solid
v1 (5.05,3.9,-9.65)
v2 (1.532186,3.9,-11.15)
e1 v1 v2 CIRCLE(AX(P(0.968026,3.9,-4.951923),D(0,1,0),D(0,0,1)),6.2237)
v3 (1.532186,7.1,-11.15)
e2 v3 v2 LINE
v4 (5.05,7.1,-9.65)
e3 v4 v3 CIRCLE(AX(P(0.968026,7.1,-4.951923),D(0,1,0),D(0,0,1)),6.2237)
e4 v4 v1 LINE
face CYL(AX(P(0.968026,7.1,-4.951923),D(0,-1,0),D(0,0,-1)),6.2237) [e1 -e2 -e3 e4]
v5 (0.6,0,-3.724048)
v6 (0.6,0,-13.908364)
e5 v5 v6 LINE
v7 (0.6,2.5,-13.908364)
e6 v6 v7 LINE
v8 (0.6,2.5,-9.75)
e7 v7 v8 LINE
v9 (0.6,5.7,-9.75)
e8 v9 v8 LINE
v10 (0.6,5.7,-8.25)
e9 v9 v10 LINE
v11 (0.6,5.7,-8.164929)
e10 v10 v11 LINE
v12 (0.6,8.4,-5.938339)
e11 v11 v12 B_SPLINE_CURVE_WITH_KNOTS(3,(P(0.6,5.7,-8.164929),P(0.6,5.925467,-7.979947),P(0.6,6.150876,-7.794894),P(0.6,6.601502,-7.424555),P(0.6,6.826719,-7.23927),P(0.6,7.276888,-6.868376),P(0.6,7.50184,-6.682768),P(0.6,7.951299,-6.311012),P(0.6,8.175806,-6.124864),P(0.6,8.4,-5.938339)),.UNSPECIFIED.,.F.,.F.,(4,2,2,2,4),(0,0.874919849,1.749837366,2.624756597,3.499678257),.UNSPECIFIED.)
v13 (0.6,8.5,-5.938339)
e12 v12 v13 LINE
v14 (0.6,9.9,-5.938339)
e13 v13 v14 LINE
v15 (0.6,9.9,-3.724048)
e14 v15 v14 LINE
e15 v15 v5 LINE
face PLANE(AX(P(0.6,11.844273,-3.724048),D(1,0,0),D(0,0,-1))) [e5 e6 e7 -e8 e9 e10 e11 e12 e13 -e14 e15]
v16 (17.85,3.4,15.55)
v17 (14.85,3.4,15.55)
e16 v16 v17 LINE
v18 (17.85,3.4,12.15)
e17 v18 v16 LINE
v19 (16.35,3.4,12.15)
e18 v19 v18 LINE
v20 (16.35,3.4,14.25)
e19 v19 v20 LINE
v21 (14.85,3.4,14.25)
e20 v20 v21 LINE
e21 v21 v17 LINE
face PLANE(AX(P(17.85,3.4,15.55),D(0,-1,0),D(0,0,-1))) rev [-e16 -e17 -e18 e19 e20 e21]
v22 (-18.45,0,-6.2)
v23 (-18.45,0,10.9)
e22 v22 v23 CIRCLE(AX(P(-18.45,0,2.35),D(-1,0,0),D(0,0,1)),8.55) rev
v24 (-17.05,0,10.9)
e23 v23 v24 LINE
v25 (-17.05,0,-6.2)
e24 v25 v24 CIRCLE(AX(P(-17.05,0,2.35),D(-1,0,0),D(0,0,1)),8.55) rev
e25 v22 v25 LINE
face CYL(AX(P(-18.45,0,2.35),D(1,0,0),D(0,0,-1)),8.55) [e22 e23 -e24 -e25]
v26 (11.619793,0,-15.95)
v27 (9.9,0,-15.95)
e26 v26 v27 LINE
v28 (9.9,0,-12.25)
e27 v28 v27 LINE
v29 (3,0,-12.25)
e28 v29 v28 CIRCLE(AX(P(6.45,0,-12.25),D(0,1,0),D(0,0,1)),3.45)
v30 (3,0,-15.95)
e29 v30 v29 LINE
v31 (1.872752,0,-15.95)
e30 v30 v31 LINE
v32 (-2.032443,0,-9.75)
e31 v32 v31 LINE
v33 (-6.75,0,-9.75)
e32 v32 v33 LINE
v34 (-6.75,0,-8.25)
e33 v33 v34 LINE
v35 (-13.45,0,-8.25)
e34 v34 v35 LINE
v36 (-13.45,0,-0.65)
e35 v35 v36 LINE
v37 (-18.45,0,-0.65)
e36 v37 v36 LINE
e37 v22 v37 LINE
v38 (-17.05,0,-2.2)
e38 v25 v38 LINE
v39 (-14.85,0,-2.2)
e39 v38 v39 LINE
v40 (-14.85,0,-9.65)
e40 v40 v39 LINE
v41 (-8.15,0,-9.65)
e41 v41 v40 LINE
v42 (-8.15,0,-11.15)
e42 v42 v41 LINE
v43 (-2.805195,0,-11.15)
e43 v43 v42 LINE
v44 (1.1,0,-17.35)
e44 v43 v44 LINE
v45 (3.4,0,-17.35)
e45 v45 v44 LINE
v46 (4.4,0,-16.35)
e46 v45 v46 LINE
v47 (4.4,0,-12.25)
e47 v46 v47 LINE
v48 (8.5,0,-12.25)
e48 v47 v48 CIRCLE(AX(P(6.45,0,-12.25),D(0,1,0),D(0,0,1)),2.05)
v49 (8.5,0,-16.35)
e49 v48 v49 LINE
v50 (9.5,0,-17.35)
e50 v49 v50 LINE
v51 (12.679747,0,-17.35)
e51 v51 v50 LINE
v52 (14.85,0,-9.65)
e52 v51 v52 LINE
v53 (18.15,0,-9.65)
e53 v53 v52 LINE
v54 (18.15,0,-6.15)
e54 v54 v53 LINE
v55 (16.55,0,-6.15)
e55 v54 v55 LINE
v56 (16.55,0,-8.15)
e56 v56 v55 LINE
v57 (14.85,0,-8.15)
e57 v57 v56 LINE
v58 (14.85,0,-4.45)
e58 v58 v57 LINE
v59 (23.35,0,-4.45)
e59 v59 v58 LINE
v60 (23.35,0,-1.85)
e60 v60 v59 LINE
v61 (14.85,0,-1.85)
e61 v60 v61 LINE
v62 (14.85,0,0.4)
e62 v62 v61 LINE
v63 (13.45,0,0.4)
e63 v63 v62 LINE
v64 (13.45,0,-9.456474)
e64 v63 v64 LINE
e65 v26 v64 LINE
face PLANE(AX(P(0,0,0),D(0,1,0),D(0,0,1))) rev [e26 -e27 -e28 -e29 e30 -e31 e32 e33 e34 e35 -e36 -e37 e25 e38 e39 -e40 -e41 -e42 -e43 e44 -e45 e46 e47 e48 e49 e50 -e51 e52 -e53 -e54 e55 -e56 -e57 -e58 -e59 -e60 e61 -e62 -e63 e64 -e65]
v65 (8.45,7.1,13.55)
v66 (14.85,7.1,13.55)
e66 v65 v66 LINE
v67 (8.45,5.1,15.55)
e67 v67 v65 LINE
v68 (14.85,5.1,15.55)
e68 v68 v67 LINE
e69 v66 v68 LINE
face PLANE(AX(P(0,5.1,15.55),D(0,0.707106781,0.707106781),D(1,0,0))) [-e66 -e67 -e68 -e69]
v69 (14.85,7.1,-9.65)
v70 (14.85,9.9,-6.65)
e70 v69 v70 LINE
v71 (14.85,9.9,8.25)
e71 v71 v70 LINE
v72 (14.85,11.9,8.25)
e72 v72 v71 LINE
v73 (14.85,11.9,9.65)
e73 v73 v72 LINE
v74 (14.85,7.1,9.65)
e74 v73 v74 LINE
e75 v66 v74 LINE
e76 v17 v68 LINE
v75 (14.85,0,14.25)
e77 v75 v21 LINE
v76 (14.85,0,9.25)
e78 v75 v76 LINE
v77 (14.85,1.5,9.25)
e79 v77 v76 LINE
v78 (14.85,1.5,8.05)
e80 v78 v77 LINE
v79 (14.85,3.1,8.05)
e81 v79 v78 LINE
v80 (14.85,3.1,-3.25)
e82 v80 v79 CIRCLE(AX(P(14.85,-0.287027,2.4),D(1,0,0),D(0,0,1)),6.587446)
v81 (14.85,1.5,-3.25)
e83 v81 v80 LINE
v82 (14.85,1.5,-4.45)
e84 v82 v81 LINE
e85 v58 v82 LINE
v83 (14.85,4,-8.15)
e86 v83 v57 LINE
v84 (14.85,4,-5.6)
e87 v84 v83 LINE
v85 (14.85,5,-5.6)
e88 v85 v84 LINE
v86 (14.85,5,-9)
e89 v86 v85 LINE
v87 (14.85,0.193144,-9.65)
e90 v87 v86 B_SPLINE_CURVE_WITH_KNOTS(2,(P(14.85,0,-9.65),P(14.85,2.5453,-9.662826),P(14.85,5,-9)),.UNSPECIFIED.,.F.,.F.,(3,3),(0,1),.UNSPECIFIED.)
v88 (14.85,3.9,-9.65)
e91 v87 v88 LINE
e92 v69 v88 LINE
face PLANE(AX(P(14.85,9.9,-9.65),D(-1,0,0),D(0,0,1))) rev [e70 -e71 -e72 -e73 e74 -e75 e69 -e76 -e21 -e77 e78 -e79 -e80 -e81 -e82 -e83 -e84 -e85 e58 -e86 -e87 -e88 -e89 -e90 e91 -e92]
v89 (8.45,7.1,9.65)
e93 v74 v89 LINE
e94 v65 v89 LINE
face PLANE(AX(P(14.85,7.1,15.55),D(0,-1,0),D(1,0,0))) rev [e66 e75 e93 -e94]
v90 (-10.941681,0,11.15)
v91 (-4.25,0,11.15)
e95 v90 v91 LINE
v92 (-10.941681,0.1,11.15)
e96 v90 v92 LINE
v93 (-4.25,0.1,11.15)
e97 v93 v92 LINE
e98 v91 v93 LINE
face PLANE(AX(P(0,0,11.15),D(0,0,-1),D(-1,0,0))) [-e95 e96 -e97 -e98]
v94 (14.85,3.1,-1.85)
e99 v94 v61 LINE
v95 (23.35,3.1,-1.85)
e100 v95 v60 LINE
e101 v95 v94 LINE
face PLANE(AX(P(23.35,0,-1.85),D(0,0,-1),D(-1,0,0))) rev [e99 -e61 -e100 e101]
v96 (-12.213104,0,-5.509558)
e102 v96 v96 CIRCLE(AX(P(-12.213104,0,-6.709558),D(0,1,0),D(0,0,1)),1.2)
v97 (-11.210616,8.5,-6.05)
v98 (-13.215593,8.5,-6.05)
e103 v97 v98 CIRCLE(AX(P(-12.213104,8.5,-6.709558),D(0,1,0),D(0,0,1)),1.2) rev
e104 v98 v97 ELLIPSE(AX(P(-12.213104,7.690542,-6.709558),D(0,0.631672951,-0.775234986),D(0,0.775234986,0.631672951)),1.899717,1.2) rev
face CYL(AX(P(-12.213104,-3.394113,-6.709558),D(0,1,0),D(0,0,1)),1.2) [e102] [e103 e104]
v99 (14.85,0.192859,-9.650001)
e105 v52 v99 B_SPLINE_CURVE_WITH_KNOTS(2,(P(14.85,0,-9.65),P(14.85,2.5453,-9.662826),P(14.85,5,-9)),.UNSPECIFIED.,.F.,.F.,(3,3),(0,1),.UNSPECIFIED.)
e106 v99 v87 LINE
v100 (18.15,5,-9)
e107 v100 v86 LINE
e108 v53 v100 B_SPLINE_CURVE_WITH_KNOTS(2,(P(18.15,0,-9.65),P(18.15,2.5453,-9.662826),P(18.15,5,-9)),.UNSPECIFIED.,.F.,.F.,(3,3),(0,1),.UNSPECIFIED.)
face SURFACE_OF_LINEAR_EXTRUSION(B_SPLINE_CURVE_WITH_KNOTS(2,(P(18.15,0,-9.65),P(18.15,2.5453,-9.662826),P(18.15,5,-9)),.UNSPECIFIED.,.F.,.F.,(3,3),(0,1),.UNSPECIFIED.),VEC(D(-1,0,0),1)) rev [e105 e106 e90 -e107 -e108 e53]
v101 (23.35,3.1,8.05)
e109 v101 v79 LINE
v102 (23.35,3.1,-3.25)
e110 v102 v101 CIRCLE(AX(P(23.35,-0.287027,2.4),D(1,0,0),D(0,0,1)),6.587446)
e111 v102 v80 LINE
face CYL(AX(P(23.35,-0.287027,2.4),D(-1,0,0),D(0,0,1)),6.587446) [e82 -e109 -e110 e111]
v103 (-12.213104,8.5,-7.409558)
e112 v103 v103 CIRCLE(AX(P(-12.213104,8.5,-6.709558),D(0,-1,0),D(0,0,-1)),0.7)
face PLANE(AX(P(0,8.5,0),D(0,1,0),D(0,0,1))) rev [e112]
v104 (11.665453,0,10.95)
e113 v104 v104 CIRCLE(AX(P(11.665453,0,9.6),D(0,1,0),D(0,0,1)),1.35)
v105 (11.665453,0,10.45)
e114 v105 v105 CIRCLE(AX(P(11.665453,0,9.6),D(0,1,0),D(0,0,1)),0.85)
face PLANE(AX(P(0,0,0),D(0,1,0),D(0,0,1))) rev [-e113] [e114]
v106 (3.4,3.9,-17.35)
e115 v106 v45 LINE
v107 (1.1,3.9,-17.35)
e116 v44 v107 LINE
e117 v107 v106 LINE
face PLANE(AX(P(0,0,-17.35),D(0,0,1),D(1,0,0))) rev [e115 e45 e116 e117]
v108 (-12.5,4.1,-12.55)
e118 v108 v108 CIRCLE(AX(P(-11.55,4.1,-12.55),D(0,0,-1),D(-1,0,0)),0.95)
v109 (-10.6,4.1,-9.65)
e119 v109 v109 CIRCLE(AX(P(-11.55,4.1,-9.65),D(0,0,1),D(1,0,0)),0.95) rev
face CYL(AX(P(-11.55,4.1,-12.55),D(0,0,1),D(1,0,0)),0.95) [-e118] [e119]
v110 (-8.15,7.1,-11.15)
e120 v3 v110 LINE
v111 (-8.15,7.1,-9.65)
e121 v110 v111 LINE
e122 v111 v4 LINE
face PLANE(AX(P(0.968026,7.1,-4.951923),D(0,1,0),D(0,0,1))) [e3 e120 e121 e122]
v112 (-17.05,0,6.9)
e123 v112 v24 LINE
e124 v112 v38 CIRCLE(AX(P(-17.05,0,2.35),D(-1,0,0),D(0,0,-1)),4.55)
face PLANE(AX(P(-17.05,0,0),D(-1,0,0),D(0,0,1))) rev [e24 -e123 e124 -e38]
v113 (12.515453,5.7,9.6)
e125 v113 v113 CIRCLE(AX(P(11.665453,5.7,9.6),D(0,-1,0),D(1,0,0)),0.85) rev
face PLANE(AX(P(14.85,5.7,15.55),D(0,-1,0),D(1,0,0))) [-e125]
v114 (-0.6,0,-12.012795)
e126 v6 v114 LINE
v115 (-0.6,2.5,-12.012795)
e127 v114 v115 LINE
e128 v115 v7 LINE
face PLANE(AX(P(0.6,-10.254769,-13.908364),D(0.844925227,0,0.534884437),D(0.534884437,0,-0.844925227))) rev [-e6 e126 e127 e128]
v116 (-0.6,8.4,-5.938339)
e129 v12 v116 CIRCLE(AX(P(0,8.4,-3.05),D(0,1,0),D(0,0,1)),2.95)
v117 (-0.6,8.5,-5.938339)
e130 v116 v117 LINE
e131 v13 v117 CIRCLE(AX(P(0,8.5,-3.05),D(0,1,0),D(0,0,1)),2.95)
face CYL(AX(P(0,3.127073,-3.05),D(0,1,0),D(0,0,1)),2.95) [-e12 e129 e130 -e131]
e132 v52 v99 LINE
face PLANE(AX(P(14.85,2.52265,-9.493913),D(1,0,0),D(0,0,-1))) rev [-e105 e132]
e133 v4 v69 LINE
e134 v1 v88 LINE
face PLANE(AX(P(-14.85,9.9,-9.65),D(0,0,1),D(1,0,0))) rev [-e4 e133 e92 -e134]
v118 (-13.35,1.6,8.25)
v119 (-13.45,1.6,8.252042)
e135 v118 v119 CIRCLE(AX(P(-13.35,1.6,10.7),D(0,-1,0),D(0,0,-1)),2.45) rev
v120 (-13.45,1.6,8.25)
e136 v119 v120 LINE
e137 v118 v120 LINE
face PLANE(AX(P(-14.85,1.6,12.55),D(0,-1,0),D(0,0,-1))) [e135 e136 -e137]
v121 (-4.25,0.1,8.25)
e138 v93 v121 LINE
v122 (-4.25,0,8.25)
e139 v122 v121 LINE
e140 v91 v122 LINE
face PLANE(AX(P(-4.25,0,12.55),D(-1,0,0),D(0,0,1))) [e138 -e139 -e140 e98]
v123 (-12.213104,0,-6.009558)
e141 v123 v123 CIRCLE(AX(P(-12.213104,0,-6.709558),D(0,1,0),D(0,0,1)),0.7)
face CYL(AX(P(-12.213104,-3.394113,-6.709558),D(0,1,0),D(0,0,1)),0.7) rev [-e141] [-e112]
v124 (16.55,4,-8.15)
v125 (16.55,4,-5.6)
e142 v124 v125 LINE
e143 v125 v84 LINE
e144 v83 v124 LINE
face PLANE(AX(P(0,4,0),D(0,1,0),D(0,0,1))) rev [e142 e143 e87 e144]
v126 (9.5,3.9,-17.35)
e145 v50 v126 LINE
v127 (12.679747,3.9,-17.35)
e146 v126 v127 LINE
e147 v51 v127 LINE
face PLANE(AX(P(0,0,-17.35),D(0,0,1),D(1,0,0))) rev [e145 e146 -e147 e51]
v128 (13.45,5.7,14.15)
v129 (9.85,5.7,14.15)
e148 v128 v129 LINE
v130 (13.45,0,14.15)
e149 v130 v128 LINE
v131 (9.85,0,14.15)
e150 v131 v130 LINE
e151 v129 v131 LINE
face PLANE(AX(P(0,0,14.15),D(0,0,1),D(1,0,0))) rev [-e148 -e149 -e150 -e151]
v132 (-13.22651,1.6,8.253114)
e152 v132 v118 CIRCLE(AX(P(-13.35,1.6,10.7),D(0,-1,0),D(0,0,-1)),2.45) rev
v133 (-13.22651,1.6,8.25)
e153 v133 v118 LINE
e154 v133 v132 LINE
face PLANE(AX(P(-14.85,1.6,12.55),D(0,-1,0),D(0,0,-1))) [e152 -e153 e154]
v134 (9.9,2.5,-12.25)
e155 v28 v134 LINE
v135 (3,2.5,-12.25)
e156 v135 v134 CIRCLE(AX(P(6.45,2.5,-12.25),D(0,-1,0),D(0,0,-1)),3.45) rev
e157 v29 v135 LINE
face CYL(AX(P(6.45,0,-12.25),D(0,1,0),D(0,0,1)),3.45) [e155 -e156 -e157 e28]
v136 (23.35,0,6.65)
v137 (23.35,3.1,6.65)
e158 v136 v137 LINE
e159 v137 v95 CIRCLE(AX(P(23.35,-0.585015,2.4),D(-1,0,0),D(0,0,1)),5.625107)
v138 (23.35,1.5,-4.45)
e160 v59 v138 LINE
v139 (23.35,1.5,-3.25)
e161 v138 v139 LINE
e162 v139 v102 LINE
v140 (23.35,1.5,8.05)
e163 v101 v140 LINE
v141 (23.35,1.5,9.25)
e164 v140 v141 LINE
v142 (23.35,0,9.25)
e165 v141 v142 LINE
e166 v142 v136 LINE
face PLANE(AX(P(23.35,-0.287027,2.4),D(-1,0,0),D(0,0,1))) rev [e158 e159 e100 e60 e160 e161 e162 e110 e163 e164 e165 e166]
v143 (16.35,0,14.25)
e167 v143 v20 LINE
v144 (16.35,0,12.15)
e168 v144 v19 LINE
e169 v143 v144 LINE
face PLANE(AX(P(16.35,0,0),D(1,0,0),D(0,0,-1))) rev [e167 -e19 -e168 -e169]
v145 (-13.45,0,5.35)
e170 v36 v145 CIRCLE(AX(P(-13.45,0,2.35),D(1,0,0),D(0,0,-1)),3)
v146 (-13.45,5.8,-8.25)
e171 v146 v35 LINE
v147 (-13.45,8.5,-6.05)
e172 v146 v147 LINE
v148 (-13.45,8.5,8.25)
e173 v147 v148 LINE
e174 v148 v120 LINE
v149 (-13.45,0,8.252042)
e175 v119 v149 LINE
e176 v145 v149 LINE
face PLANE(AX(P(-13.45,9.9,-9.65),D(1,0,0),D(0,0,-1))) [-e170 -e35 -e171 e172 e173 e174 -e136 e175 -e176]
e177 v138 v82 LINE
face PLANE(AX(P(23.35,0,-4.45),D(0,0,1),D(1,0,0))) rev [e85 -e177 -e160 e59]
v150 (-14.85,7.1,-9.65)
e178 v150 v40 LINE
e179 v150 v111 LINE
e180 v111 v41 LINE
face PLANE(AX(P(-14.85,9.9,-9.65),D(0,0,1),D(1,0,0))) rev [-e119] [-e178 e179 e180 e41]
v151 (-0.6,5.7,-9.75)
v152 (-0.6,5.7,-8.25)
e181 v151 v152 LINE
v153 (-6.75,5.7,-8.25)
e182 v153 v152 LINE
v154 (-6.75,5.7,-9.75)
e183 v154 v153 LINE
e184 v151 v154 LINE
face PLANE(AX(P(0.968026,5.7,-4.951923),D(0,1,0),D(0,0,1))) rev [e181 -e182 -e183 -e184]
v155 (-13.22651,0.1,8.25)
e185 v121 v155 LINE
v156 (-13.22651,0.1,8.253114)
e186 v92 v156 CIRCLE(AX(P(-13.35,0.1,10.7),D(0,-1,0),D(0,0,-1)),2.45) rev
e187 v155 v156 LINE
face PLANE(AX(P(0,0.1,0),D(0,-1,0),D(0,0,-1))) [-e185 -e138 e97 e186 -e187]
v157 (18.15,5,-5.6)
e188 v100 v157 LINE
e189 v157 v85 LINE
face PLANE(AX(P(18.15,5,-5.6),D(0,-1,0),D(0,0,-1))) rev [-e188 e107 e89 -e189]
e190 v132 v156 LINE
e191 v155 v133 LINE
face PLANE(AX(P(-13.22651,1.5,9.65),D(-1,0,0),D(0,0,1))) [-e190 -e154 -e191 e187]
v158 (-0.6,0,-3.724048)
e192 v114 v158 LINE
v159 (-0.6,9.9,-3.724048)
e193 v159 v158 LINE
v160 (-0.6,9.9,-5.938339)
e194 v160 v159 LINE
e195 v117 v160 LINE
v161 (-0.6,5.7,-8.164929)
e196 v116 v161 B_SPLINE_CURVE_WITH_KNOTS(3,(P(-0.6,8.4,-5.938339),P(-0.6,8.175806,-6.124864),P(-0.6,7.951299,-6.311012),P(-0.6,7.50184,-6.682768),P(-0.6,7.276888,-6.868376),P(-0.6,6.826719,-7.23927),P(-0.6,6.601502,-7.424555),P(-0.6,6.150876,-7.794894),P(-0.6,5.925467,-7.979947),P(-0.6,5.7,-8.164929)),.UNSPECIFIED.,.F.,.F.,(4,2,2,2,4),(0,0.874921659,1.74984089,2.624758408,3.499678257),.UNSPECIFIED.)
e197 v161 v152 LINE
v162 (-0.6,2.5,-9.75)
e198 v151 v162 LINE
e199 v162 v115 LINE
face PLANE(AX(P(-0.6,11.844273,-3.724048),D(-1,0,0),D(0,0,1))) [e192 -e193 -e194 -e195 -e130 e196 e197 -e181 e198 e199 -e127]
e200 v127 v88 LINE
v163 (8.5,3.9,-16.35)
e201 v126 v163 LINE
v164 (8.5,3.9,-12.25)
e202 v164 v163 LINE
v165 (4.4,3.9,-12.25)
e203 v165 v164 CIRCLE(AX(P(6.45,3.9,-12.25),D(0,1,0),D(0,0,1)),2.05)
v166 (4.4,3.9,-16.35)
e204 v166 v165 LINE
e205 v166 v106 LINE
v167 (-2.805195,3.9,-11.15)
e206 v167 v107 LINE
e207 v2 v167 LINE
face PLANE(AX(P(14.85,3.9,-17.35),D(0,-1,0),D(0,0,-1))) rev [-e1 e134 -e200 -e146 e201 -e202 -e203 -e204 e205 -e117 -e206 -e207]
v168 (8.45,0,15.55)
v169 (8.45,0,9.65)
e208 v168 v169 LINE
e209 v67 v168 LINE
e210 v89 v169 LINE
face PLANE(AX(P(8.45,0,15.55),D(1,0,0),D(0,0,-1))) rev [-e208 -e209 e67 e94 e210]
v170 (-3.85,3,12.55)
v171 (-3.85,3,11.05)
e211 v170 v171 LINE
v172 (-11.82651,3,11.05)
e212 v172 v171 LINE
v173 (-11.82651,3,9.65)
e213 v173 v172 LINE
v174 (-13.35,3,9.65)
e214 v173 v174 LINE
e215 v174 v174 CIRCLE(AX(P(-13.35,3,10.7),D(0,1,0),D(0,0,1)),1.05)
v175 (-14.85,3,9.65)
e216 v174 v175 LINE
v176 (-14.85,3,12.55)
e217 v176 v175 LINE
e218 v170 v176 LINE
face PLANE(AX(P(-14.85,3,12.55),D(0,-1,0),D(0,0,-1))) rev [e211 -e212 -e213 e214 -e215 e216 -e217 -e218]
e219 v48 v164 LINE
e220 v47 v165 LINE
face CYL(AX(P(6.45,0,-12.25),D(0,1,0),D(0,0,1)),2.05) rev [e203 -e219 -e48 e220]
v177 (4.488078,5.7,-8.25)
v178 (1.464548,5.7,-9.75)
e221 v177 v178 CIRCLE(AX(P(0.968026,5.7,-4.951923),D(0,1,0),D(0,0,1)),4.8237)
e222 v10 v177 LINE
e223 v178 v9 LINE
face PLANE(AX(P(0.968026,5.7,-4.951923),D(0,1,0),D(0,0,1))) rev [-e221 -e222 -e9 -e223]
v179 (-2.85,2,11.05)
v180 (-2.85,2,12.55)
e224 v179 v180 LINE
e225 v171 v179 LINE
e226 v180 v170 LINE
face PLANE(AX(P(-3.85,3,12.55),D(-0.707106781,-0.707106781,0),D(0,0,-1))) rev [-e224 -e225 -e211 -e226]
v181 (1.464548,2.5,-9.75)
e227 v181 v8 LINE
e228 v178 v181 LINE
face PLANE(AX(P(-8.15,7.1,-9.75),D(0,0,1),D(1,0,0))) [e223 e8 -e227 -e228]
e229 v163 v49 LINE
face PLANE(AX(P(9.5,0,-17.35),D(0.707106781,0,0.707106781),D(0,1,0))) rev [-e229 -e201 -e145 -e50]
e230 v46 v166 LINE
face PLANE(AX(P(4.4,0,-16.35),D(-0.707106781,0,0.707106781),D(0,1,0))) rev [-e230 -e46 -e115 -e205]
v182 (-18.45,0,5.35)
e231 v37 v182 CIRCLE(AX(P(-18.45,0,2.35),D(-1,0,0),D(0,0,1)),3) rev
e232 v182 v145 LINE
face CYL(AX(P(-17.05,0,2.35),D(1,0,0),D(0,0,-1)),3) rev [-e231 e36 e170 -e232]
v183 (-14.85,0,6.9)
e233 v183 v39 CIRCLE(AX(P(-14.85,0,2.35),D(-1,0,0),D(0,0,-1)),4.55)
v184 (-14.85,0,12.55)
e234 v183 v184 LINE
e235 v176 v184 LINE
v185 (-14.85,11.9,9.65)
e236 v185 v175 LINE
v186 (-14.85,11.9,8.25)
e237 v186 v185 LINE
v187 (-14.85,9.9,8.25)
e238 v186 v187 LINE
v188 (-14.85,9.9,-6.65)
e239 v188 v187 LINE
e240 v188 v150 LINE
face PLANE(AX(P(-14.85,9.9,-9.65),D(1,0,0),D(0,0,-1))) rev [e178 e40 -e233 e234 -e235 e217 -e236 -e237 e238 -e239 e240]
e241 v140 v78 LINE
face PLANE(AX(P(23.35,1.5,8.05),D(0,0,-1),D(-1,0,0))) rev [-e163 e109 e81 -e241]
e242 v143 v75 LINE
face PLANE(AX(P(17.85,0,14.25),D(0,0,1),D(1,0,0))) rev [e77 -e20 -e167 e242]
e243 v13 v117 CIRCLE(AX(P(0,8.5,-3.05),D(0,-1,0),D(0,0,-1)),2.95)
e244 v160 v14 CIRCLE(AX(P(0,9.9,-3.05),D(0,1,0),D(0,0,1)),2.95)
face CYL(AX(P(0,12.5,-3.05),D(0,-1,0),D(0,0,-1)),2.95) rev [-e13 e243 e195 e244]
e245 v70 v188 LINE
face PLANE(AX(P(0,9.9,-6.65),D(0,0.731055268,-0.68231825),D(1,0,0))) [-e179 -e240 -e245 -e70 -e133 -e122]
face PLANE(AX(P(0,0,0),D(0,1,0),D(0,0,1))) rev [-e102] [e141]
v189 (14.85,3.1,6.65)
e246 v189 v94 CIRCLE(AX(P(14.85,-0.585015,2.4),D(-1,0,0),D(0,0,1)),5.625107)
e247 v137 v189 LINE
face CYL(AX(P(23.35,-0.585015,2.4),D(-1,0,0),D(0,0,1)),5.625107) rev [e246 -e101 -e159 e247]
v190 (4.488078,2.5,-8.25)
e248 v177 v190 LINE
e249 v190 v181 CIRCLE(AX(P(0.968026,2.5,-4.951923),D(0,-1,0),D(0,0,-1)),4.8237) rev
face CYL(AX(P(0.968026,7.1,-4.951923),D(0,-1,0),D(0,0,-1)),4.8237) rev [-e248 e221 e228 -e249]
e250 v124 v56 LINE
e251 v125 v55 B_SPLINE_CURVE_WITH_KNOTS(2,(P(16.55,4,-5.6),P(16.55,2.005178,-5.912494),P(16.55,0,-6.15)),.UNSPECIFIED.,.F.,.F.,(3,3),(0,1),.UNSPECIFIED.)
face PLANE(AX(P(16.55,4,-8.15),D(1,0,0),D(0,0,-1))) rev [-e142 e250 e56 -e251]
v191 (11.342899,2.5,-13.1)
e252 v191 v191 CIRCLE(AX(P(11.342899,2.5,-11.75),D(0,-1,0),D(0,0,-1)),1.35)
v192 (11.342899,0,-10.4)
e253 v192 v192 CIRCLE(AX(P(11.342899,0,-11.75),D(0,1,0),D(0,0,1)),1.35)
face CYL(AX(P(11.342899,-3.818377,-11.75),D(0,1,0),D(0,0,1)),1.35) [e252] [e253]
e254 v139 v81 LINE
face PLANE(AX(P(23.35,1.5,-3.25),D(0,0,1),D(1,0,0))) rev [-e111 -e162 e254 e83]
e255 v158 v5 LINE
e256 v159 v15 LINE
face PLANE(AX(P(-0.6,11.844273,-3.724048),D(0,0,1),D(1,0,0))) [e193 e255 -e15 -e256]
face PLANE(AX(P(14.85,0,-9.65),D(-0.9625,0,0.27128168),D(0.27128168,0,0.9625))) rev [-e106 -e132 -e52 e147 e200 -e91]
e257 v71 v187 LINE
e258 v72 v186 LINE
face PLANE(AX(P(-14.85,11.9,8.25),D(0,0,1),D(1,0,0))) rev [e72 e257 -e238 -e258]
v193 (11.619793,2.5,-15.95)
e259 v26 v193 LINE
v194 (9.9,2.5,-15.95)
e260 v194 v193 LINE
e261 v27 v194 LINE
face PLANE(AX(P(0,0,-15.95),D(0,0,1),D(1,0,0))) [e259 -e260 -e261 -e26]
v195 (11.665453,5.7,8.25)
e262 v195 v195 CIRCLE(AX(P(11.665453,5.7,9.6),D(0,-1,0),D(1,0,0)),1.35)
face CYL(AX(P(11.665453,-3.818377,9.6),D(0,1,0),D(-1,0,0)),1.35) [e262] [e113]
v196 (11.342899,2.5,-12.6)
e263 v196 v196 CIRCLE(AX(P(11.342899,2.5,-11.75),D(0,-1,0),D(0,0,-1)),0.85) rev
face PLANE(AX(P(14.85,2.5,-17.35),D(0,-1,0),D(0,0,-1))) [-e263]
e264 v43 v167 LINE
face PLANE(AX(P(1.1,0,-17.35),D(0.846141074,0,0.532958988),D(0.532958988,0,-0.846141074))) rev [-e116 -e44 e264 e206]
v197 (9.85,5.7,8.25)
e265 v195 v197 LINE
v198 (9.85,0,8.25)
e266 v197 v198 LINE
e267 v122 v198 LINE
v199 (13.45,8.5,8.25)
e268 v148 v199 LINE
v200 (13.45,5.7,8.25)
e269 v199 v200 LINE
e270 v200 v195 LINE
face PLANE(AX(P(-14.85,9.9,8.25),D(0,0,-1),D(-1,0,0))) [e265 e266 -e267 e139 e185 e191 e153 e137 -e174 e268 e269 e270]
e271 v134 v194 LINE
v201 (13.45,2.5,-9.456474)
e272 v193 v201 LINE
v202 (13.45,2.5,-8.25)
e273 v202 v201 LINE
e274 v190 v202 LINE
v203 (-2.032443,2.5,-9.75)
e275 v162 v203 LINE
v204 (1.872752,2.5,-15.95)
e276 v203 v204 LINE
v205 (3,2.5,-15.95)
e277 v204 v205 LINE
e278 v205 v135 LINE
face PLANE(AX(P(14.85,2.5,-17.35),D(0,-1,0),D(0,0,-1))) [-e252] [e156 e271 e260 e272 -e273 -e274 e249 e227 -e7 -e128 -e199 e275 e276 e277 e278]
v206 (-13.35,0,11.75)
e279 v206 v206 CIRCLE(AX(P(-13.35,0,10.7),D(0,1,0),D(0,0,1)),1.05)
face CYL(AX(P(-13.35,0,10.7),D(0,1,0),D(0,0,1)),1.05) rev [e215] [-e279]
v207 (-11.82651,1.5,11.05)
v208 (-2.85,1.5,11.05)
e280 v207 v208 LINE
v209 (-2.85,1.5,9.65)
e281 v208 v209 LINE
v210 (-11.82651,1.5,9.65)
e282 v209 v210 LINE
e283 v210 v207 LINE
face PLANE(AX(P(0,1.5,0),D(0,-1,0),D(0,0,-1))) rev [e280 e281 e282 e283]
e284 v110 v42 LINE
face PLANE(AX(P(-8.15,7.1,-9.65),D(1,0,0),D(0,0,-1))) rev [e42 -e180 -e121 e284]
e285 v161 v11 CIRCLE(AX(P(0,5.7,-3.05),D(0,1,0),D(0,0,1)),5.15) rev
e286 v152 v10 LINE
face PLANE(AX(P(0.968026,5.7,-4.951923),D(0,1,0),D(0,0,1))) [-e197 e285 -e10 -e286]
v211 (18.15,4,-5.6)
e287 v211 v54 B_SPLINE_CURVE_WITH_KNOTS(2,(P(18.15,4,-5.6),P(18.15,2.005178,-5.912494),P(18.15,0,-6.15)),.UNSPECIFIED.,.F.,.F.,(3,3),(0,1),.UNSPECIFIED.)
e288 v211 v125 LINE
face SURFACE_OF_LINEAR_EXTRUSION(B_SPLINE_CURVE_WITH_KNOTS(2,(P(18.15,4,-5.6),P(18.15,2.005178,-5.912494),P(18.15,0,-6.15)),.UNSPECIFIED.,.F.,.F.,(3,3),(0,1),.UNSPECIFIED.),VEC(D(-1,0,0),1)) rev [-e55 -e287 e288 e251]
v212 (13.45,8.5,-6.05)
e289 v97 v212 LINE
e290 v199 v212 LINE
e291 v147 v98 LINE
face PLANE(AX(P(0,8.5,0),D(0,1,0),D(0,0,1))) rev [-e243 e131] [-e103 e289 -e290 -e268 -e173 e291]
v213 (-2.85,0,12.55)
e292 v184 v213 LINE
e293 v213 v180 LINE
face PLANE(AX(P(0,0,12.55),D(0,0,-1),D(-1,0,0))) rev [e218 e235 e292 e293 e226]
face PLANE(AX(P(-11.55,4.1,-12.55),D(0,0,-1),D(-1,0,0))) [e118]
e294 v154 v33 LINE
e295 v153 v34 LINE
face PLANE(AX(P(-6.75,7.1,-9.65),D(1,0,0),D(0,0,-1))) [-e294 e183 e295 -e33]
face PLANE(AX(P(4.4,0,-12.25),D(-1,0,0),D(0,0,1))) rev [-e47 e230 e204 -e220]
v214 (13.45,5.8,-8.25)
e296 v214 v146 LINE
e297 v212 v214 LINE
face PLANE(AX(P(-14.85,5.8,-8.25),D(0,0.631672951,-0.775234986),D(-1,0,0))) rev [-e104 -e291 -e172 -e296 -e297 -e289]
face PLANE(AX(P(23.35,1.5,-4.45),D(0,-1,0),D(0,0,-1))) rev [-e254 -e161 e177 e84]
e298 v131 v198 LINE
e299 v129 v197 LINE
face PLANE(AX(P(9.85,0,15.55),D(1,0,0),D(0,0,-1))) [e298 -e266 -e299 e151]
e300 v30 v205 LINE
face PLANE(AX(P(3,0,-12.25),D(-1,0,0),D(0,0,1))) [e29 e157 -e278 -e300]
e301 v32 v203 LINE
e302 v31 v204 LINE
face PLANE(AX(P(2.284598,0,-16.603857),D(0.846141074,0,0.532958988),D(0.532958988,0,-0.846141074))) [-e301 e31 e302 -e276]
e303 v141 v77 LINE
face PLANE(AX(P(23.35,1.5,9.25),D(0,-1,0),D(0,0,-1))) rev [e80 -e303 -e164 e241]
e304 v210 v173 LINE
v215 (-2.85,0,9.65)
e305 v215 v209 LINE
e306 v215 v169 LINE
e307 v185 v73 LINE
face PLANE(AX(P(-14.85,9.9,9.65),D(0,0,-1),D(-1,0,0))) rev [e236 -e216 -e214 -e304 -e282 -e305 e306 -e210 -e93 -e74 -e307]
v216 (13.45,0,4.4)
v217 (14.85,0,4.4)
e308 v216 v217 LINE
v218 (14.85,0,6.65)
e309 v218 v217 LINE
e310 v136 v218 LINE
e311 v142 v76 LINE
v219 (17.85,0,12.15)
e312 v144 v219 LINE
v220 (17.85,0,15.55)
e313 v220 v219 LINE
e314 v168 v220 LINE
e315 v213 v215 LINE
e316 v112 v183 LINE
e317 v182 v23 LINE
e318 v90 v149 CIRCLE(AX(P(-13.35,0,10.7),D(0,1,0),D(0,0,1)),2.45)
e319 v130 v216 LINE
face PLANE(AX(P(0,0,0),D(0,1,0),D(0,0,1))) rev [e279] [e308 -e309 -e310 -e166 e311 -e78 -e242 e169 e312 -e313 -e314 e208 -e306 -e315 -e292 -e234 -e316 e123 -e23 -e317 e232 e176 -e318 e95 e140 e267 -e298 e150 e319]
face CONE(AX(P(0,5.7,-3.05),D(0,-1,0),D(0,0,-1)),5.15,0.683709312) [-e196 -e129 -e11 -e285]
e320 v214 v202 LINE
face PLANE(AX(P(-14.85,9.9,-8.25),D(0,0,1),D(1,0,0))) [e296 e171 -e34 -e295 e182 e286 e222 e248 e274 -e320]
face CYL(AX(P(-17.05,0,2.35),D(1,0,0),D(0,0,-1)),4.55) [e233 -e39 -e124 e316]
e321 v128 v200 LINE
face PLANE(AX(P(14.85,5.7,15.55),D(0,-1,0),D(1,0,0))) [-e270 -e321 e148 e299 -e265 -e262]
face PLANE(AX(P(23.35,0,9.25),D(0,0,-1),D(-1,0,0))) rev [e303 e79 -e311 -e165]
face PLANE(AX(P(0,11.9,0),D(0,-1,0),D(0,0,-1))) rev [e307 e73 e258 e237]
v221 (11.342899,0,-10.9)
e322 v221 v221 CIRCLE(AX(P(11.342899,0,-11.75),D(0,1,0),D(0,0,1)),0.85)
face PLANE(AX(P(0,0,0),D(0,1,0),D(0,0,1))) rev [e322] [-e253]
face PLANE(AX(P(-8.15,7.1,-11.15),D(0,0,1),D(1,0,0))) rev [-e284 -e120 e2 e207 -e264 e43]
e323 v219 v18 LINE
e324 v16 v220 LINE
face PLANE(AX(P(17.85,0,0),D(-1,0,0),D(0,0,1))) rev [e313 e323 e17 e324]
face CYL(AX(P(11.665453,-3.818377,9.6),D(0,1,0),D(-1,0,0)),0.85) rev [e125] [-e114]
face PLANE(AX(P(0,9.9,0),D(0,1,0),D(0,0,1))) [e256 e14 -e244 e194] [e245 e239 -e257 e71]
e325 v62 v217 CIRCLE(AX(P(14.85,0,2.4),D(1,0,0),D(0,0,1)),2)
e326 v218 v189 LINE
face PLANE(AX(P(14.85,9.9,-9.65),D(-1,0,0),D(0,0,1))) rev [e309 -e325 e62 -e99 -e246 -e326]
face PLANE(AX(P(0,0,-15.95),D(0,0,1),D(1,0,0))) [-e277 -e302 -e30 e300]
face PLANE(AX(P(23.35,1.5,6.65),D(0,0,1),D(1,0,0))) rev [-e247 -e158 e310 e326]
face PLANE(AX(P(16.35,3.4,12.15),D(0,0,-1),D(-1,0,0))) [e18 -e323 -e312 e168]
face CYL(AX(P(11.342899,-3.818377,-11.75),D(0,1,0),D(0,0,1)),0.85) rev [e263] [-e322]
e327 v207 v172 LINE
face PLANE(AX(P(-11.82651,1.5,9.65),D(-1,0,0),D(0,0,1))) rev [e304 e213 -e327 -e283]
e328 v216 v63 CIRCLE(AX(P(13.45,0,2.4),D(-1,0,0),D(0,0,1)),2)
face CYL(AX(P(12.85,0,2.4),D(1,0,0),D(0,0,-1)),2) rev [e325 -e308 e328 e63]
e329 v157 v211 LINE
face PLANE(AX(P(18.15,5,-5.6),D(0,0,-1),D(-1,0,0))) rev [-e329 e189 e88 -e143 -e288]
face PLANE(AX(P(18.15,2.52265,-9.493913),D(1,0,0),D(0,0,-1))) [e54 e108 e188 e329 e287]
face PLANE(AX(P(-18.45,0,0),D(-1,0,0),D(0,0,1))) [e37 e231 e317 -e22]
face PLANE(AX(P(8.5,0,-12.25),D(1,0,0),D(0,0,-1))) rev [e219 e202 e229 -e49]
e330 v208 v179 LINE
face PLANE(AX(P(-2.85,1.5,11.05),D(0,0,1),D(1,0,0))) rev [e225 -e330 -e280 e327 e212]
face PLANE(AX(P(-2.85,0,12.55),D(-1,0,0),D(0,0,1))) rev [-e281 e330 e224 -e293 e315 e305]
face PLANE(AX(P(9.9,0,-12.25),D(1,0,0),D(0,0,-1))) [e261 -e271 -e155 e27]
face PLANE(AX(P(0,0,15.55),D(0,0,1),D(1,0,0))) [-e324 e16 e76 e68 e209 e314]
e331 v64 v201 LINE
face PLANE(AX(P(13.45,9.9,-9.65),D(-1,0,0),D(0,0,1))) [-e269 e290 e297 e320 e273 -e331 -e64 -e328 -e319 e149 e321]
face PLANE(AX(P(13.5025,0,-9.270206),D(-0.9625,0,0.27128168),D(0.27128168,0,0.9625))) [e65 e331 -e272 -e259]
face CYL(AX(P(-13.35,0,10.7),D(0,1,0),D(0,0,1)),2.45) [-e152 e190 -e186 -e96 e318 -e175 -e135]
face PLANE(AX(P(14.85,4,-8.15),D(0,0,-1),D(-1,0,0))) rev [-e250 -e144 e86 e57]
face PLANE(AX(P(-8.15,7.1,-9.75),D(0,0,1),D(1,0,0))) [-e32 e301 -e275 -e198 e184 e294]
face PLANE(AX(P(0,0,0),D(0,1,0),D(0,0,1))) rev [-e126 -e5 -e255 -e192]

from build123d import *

# Parameters (mm, degrees)
SKETCH1_W            = 29.7
SKETCH1_H            = 19.3
BOSS_EXTRUDE1_DEPTH  = 9.9
SKETCH2_W            = 23.1
SKETCH2_H            = 3.9
BOSS_EXTRUDE3_DEPTH  = 7.7
CUT_EXTRUDE1_DEPTH   = 24.612390815
BOSS_EXTRUDE4_DEPTH  = 3.2
BOSS_EXTRUDE5_DEPTH  = 3.9
SKETCH7_R            = 0.95
BOSS_EXTRUDE6_DEPTH  = 2.9
BOSS_EXTRUDE8_DEPTH  = 8.5
SKETCH10_W           = 12
SKETCH10_H           = 3
BOSS_EXTRUDE9_DEPTH  = 2.9
SKETCH11_W           = 8.976509782
SKETCH11_H           = 1.4
CUT_EXTRUDE2_DEPTH   = 1.5
SKETCH14_R           = 1.05
CUT_EXTRUDE3_DEPTH   = 30.897407914
SKETCH15_W           = 6.4
SKETCH15_H           = 7.1
BOSS_EXTRUDE10_DEPTH = 5.9
SKETCH16_W           = 1.3
SKETCH16_H           = 3.4
BOSS_EXTRUDE11_DEPTH = 3
SKETCH17_W           = 3.4
SKETCH17_H           = 3.4
BOSS_EXTRUDE12_DEPTH = 1.5
BOSS_EXTRUDE13_DEPTH = 2.2
BOSS_EXTRUDE15_DEPTH = 1.4
SKETCH21_W           = 29.7
SKETCH21_H           = 1.4
BOSS_EXTRUDE16_DEPTH = 2
SHELL1_OUTLINE_W     = 26.9
SHELL1_OUTLINE_H     = 16.5
SHELL1_DEPTH         = 8.5
SHELL1_2_OUTLINE_W   = 3.6
SHELL1_2_OUTLINE_H   = 5.9
SHELL1_2_DEPTH       = 2.5
SHELL1_START         = 2.5
SHELL1_3_OUTLINE_W   = 3.6
SHELL1_3_OUTLINE_H   = 5.9
SHELL1_3_DEPTH       = 3.2
SHELL1_4_DEPTH       = 0.1
SHELL1_START_2       = 0.1
SHELL1_5_DEPTH       = 1.5
CUT_EXTRUDE5_START   = -2
CUT_EXTRUDE5_DEPTH   = 2
CUT_EXTRUDE6_DEPTH   = 2
BOSS_EXTRUDE17_DEPTH = 3.3
SKETCH26_W           = 1.7
SKETCH26_H           = 3.040173169
CUT_EXTRUDE8_DEPTH   = 4
SKETCH32_R           = 1.35
SKETCH32_R_2         = 0.85
BOSS_EXTRUDE22_DEPTH = 5.7
SKETCH33_R           = 1.35
SKETCH33_R_2         = 0.85
BOSS_EXTRUDE23_DEPTH = 2.5
SKETCH34_R           = 1.2
SKETCH34_R_2         = 0.7
BOSS_EXTRUDE24_DEPTH = 8.5
SKETCH35_R           = 2.95
CUT_EXTRUDE9_DEPTH   = 4
CHAMFER1_SIZE2       = 3
CHAMFER1_SIZE        = 2.8
CHAMFER2_SIZE        = 1
CHAMFER3_SIZE        = 1
CHAMFER4_SIZE        = 2
SKETCH36_W           = 1.2
SKETCH36_H           = 6.025951521
BOSS_EXTRUDE25_DEPTH = 3.2
BOSS_EXTRUDE33_START = -4.2
BOSS_EXTRUDE33_DEPTH = 4.2
BOSS_EXTRUDE36_DEPTH = 2.5
CHAMFER5_SIZE        = 2.2
CHAMFER5_SIZE_2      = 2.7
CHAMFER6_SIZE        = 2.7
CHAMFER6_SIZE2       = 2.2


# Read off the part's stored shape, not the designer's step: Shell1
# Some blends are built 0.0001 mm under size
with BuildPart() as part:
    # Sketch1 → Boss-Extrude1 (new body)
    with BuildSketch(Plane(origin=(0, 0, 0), x_dir=(1, 0, 0), z_dir=(0, 1, 0))):
        Rectangle(SKETCH1_W, SKETCH1_H)
    extrude(amount=BOSS_EXTRUDE1_DEPTH)

    # Sketch2 → Boss-Extrude3 (add)
    with BuildSketch(Plane(origin=(0, 0, -9.65), x_dir=(-1, 0, 0), z_dir=(0, 0, -1))):
        with Locations((-3.3, 1.95)):
            Rectangle(SKETCH2_W, SKETCH2_H)
    extrude(amount=BOSS_EXTRUDE3_DEPTH)

    # Sketch4 → Cut-Extrude1 (cut, through all)
    with BuildSketch(Plane(origin=(0, 3.9, 0), x_dir=(1, 0, 0), z_dir=(0, 1, 0))):
        with BuildLine():
            Line((8.5, 12.25), (8.5, 17.35))
            Line((8.5, 17.35), (4.4, 17.35))
            Line((4.4, 17.35), (4.4, 12.25))
            ThreePointArc((4.4, 12.25), (6.45, 10.2), (8.5, 12.25))
        make_face()
        Polygon((14.85, 9.65), (12.679746559, 17.35), (14.85, 17.35), align=None)
        Polygon((1.1, 17.35), (-3.75, 9.65), (-8.25, 9.65), (-8.25, 17.35), align=None)
    extrude(amount=-CUT_EXTRUDE1_DEPTH, mode=Mode.SUBTRACT)

    # Sketch5 → Boss-Extrude4 (add)
    with BuildSketch(Plane(origin=(0, 3.9, 0), x_dir=(1, 0, 0), z_dir=(0, 1, 0))):
        with BuildLine():
            Line((-8.15, 9.65), (5.05, 9.65))
            ThreePointArc((5.05, 9.65), (3.409161026, 10.676894337), (1.53218592, 11.15))
            Line((1.53218592, 11.15), (-8.15, 11.15))
            Line((-8.15, 11.15), (-8.15, 9.65))
        make_face()
    extrude(amount=BOSS_EXTRUDE4_DEPTH)

    # Sketch6 → Boss-Extrude5 (add)
    with BuildSketch(Plane.XZ.offset(-3.9)):
        Polygon((-8.15, -9.65), (-8.15, -11.15), (-2.805194805, -11.15), (-3.75, -9.65), align=None)
    extrude(amount=BOSS_EXTRUDE5_DEPTH)

    # Sketch7 → Boss-Extrude6 (add)
    with BuildSketch(Plane(origin=(0, 0, -9.65), x_dir=(-1, 0, 0), z_dir=(0, 0, -1))):
        with Locations(Location((11.55, 4.1, 0), (0, 0, 180))):
            Circle(SKETCH7_R)
    extrude(amount=BOSS_EXTRUDE6_DEPTH)

    # Sketch8 → Boss-Extrude8 (add)
    with BuildSketch(Plane(origin=(14.85, 0, 0), x_dir=(0, 0, -1), z_dir=(1, 0, 0))):
        with BuildLine():
            Line((4.45, 0), (1.85, 0))
            Line((1.85, 0), (1.85, 1.5))
            Line((1.85, 1.5), (1.85, 3.1))
            ThreePointArc((1.85, 3.1), (-2.4, 5.040092727), (-6.65, 3.1))
            Line((-6.65, 3.1), (-6.65, 1.5))
            Line((-6.65, 1.5), (-6.65, 0))
            Line((-6.65, 0), (-9.25, 0))
            Line((-9.25, 0), (-9.25, 1.5))
            Line((-9.25, 1.5), (-8.05, 1.5))
            Line((-8.05, 1.5), (-8.05, 3.1))
            ThreePointArc((-8.05, 3.1), (-2.4, 6.300419583), (3.25, 3.1))
            Line((3.25, 3.1), (3.25, 1.5))
            Line((3.25, 1.5), (4.45, 1.5))
            Line((4.45, 1.5), (4.45, 0))
        make_face()
    extrude(amount=BOSS_EXTRUDE8_DEPTH)

    # Sketch10 → Boss-Extrude9 (add)
    with BuildSketch(Plane.XY.offset(9.65)):
        with Locations((-8.85, 1.5)):
            Rectangle(SKETCH10_W, SKETCH10_H)
    extrude(amount=BOSS_EXTRUDE9_DEPTH)

    # Sketch11 → Cut-Extrude2 (cut)
    with BuildSketch(Plane(origin=(0, 3, 0), x_dir=(1, 0, 0), z_dir=(0, 1, 0))):
        with Locations((-7.338254891, -10.35)):
            Rectangle(SKETCH11_W, SKETCH11_H)
    extrude(amount=-CUT_EXTRUDE2_DEPTH, mode=Mode.SUBTRACT)

    # Sketch14 → Cut-Extrude3 (cut, through all)
    with BuildSketch(Plane(origin=(0, 3, 0), x_dir=(1, 0, 0), z_dir=(0, 1, 0))):
        with Locations(Location((-13.35, -10.7, 0), (0, 0, 270))):
            Circle(SKETCH14_R)
    extrude(amount=-CUT_EXTRUDE3_DEPTH, mode=Mode.SUBTRACT)

    # Sketch15 → Boss-Extrude10 (add)
    with BuildSketch(Plane.XY.offset(9.65)):
        with Locations((11.65, 3.55)):
            Rectangle(SKETCH15_W, SKETCH15_H)
    extrude(amount=BOSS_EXTRUDE10_DEPTH)

    # Sketch16 → Boss-Extrude11 (add)
    with BuildSketch(Plane(origin=(14.85, 0, 0), x_dir=(0, 0, -1), z_dir=(1, 0, 0))):
        with Locations((-14.9, 1.7)):
            Rectangle(SKETCH16_W, SKETCH16_H)
    extrude(amount=BOSS_EXTRUDE11_DEPTH)

    # Sketch17 → Boss-Extrude12 (add)
    with BuildSketch(Plane(origin=(17.85, 0, 0), x_dir=(0, 0, -1), z_dir=(1, 0, 0))):
        with Locations((-13.85, 1.7)):
            Rectangle(SKETCH17_W, SKETCH17_H)
    extrude(amount=-BOSS_EXTRUDE12_DEPTH)

    # Sketch19 → Boss-Extrude13 (add)
    with BuildSketch(Plane.ZY.offset(14.85)):
        with BuildLine():
            Line((-2.2, 0), (-0.65, 0))
            ThreePointArc((-0.65, 0), (2.35, 3), (5.35, 0))
            Line((5.35, 0), (6.9, 0))
            ThreePointArc((6.9, 0), (2.35, 4.55), (-2.2, 0))
        make_face()
    extrude(amount=BOSS_EXTRUDE13_DEPTH)

    # Sketch20 → Boss-Extrude15 (add)
    with BuildSketch(Plane.ZY.offset(17.05)):
        with BuildLine():
            ThreePointArc((10.9, 0), (2.35, 8.55), (-6.2, 0))
            Line((-6.2, 0), (-2.2, 0))
            Line((-2.2, 0), (-0.65, 0))
            ThreePointArc((-0.65, 0), (2.35, 3), (5.35, 0))
            Line((5.35, 0), (6.9, 0))
            Line((6.9, 0), (10.9, 0))
        make_face()
    extrude(amount=BOSS_EXTRUDE15_DEPTH)

    # Sketch21 → Boss-Extrude16 (add)
    with BuildSketch(Plane(origin=(0, 9.9, 0), x_dir=(1, 0, 0), z_dir=(0, 1, 0))):
        with Locations((0, -8.95)):
            Rectangle(SKETCH21_W, SKETCH21_H)
    extrude(amount=BOSS_EXTRUDE16_DEPTH)

    # Shell1 outline → Shell1 (cut)
    with BuildSketch(Plane(origin=(0, 0, 0), x_dir=(1, 0, 0), z_dir=(0, 1, 0))):
        Rectangle(SHELL1_OUTLINE_W, SHELL1_OUTLINE_H)
    extrude(amount=SHELL1_DEPTH, mode=Mode.SUBTRACT)

    # Shell1 2 outline → Shell1 2 (cut)
    with BuildSketch(Plane(origin=(0, 0, 0), x_dir=(1, 0, 0), z_dir=(0, 1, 0))):
        with Locations((11.65, -11.2)):
            Rectangle(SHELL1_2_OUTLINE_W, SHELL1_2_OUTLINE_H)
        with BuildLine():
            Line((13.45, 8.25), (13.45, 9.456474215))
            Line((13.45, 9.456474215), (11.619792639, 15.95))
            Line((11.619792639, 15.95), (9.9, 15.95))
            Line((9.9, 15.95), (9.9, 12.25))
            ThreePointArc((9.9, 12.25), (6.45, 8.8), (3, 12.25))
            Line((3, 12.25), (3, 15.95))
            Line((3, 15.95), (1.872752248, 15.95))
            Line((1.872752248, 15.95), (-2.032442558, 9.75))
            Line((-2.032442558, 9.75), (-6.75, 9.75))
            Line((-6.75, 9.75), (-6.75, 8.25))
            Line((-6.75, 8.25), (13.45, 8.25))
        make_face()
    extrude(amount=SHELL1_2_DEPTH, mode=Mode.SUBTRACT)

    # Shell1 3 outline → Shell1 3 (cut)
    with BuildSketch(Plane(origin=(0, 0, 0), x_dir=(1, 0, 0), z_dir=(0, 1, 0)).offset(SHELL1_START)):
        with Locations((11.65, -11.2)):
            Rectangle(SHELL1_3_OUTLINE_W, SHELL1_3_OUTLINE_H)
        with BuildLine():
            Line((-6.75, 8.25), (4.488078335, 8.25))
            ThreePointArc((4.488078335, 8.25), (3.111788225, 9.273075846), (1.464547501, 9.75))
            Line((1.464547501, 9.75), (-6.75, 9.75))
            Line((-6.75, 9.75), (-6.75, 8.25))
        make_face()
    extrude(amount=SHELL1_3_DEPTH, mode=Mode.SUBTRACT)

    # Shell1 4 outline → Shell1 4 (cut)
    with BuildSketch(Plane(origin=(0, 0, 0), x_dir=(1, 0, 0), z_dir=(0, 1, 0))):
        with BuildLine():
            Line((-4.25, -11.15), (-4.25, -8.25))
            Line((-4.25, -8.25), (-13.35, -8.25))
            ThreePointArc((-13.35, -8.25), (-11.465192318, -9.134752416), (-10.941681084, -11.15))
            Line((-10.941681084, -11.15), (-4.25, -11.15))
        make_face()
        with BuildLine():
            ThreePointArc((-13.45, -8.252041667), (-13.40001042, -8.25051047), (-13.35, -8.25))
            Line((-13.35, -8.25), (-13.45, -8.25))
            Line((-13.45, -8.25), (-13.45, -8.252041667))
        make_face()
    extrude(amount=SHELL1_4_DEPTH, mode=Mode.SUBTRACT)

    # Shell1 5 outline → Shell1 5 (cut)
    with BuildSketch(Plane(origin=(0, 0, 0), x_dir=(1, 0, 0), z_dir=(0, 1, 0)).offset(SHELL1_START_2)):
        with BuildLine():
            Line((-13.226509782, -8.25311419), (-13.226509782, -8.25))
            Line((-13.226509782, -8.25), (-13.35, -8.25))
            ThreePointArc((-13.35, -8.25), (-13.288235261, -8.250778671), (-13.226509782, -8.25311419))
        make_face()
        with BuildLine():
            ThreePointArc((-13.45, -8.252041667), (-13.40001042, -8.25051047), (-13.35, -8.25))
            Line((-13.35, -8.25), (-13.45, -8.25))
            Line((-13.45, -8.25), (-13.45, -8.252041667))
        make_face()
    extrude(amount=SHELL1_5_DEPTH, mode=Mode.SUBTRACT)

    # Sketch23 → Cut-Extrude5 (cut)
    with BuildSketch(Plane.ZY.offset(14.85).offset(CUT_EXTRUDE5_START)):
        with BuildLine():
            Line((-0.65, 0), (5.35, 0))
            ThreePointArc((5.35, 0), (2.35, 3), (-0.65, 0))
        make_face()
    extrude(amount=CUT_EXTRUDE5_DEPTH, mode=Mode.SUBTRACT)

    # Sketch24 → Cut-Extrude6 (cut)
    with BuildSketch(Plane(origin=(14.85, 0, 0), x_dir=(0, 0, -1), z_dir=(1, 0, 0))):
        with BuildLine():
            Line((-4.4, 0), (-0.4, 0))
            ThreePointArc((-0.4, 0), (-2.4, 2), (-4.4, 0))
        make_face()
    extrude(amount=-CUT_EXTRUDE6_DEPTH, mode=Mode.SUBTRACT)

    # Sketch25 → Boss-Extrude17 (add)
    with BuildSketch(Plane(origin=(14.85, 0, 0), x_dir=(0, 0, -1), z_dir=(1, 0, 0))):
        with BuildLine():
            Line((9.65, 0), (6.15, 0))
            add(Edge.make_bspline(
                [(5.6, 4), (5.912494259, 2.005178445), (6.15, 0)],
                knots=[0, 0, 0, 1, 1, 1], degree=2))
            Line((5.6, 4), (5.6, 5))
            Line((5.6, 5), (9, 5))
            add(Edge.make_bspline(
                [(9, 5), (9.662826285, 2.545299606), (9.65, 0)],
                knots=[0, 0, 0, 1, 1, 1], degree=2))
        make_face()
    extrude(amount=BOSS_EXTRUDE17_DEPTH)

    # Sketch26 → Cut-Extrude8 (cut)
    with BuildSketch(Plane.XZ):
        with Locations((15.7, -6.629913416)):
            Rectangle(SKETCH26_W, SKETCH26_H)
    extrude(amount=-CUT_EXTRUDE8_DEPTH, mode=Mode.SUBTRACT)

    # Sketch32 → Boss-Extrude22 (add)
    with BuildSketch(Plane.XZ.offset(-5.7)):
        with Locations(Location((11.665452924, 9.6, 0), (0, 0, 90))):
            Circle(SKETCH32_R)
        with Locations(Location((11.665452924, 9.6, 0), (0, 0, 90))):
            Circle(SKETCH32_R_2, mode=Mode.SUBTRACT)
    extrude(amount=BOSS_EXTRUDE22_DEPTH)

    # Sketch33 → Boss-Extrude23 (add)
    with BuildSketch(Plane.XZ.offset(-2.5)):
        with Locations(Location((11.342898785, -11.75, 0), (0, 0, 90))):
            Circle(SKETCH33_R)
        with Locations(Location((11.342898785, -11.75, 0), (0, 0, 90))):
            Circle(SKETCH33_R_2, mode=Mode.SUBTRACT)
    extrude(amount=BOSS_EXTRUDE23_DEPTH)

    # Sketch34 → Boss-Extrude24 (add)
    with BuildSketch(Plane.XZ.offset(-8.5)):
        with Locations(Location((-12.21310403, -6.709558041, 0), (0, 0, 90))):
            Circle(SKETCH34_R)
        with Locations(Location((-12.21310403, -6.709558041, 0), (0, 0, 90))):
            Circle(SKETCH34_R_2, mode=Mode.SUBTRACT)
    extrude(amount=BOSS_EXTRUDE24_DEPTH)

    # Sketch35 → Cut-Extrude9 (cut)
    with BuildSketch(Plane.XZ.offset(-8.5)):
        with Locations(Location((0, -3.05, 0), (0, 0, 270))):
            Circle(SKETCH35_R)
    extrude(amount=-CUT_EXTRUDE9_DEPTH, mode=Mode.SUBTRACT)

    # Chamfer1
    chamfer1_edges = [part.edges().sort_by_distance(p)[0] for p in [
        (0, 9.9, -9.65),
    ]]
    chamfer1_side = [part.faces().sort_by_distance(p)[0] for p in [
        (0, 9.844, -9.65),
    ]]
    chamfer(chamfer1_edges, length=CHAMFER1_SIZE - 0.0001, length2=CHAMFER1_SIZE2 - 0.0001, reference=chamfer1_side[0])  # a hair under: the kernel refuses the full size

    # Chamfer2
    chamfer2_edges = [part.edges().sort_by_distance(p)[0] for p in [
        (4.4, 1.95, -17.35),
        (8.5, 1.95, -17.35),
    ]]
    chamfer(chamfer2_edges, length=CHAMFER2_SIZE)

    # Chamfer3
    chamfer3_edges = [part.edges().sort_by_distance(p)[0] for p in [
        (-2.85, 3, 11.8),
    ]]
    chamfer(chamfer3_edges, length=CHAMFER3_SIZE)

    # Chamfer4
    chamfer4_edges = [part.edges().sort_by_distance(p)[0] for p in [
        (11.65, 7.1, 15.55),
    ]]
    chamfer(chamfer4_edges, length=CHAMFER4_SIZE)

    # Sketch36 → Boss-Extrude25 (add)
    with BuildSketch(Plane.XZ.offset(-2.5)):
        with Locations((0, -6.73702424)):
            Rectangle(SKETCH36_W, SKETCH36_H)
    extrude(amount=-BOSS_EXTRUDE25_DEPTH)

    # Sketch39 → Boss-Extrude33 (add)
    with BuildSketch(Plane(origin=(0, 9.9, 0), x_dir=(1, 0, 0), z_dir=(0, 1, 0)).offset(BOSS_EXTRUDE33_START)):
        with BuildLine():
            Line((-0.6, 3.724048479), (0.6, 3.724048479))
            Line((0.6, 3.724048479), (0.6, 5.938338623))
            ThreePointArc((0.6, 5.938338623), (0, 6), (-0.6, 5.938338623))
            Line((-0.6, 5.938338623), (-0.6, 3.724048479))
        make_face()
    extrude(amount=BOSS_EXTRUDE33_DEPTH)

    # Sketch42 → Boss-Extrude36 (add)
    with BuildSketch(Plane.XZ.offset(-2.5)):
        Polygon((0.6, -12.012795022), (0.6, -13.908363861), (-0.6, -12.012795022), (-0.6, -3.724048479), (0.6, -3.724048479), align=None)
    extrude(amount=BOSS_EXTRUDE36_DEPTH)

    # Chamfer5
    # the kernel refuses this chamfer: 2.7, 2.2 mm, written as the material it adds along each edge
    with BuildSketch(Plane(origin=(13.45, 8.5, -8.25), x_dir=(0, 0.036887238791768716, 0.9993194342222707), z_dir=(-1, 0, 0))) as chamfer5_piece_1_section:
        Polygon((CHAMFER5_SIZE * 0.999319434222, -CHAMFER5_SIZE * 0.0368872387918), (-CHAMFER5_SIZE_2 * 0.0368872387918, -CHAMFER5_SIZE_2 * 0.999319434222), (0, 0), align=None)
    chamfer5_piece_1 = extrude(amount=26.9, mode=Mode.PRIVATE)
    chamfer5_piece_1 = split(chamfer5_piece_1, bisect_by=Plane(origin=(0.622533922, 8.383179545, -8.275268643), z_dir=(0, -0.7310560786244812, 0.6823173820929644)), keep=Keep.TOP, mode=Mode.PRIVATE)
    chamfer5_piece_1 = chamfer5_piece_1 - Plane(origin=(-12.21310403, 7.587854382, -6.709558041), x_dir=(0, 0, 1), z_dir=(0, 1, 0)) * Cylinder(0.7, 65, mode=Mode.PRIVATE)
    add(chamfer5_piece_1)

    # Chamfer6
    chamfer6_edges = [part.edges().sort_by_distance(p)[0] for p in [
        (0, 5.7, -6),
    ]]
    chamfer6_side = [part.faces().sort_by_distance(p)[0] for p in [
        (0, 7.1, -6),
    ]]
    chamfer(chamfer6_edges, length=CHAMFER6_SIZE, length2=CHAMFER6_SIZE2, reference=chamfer6_side[0])


solid = part.part
